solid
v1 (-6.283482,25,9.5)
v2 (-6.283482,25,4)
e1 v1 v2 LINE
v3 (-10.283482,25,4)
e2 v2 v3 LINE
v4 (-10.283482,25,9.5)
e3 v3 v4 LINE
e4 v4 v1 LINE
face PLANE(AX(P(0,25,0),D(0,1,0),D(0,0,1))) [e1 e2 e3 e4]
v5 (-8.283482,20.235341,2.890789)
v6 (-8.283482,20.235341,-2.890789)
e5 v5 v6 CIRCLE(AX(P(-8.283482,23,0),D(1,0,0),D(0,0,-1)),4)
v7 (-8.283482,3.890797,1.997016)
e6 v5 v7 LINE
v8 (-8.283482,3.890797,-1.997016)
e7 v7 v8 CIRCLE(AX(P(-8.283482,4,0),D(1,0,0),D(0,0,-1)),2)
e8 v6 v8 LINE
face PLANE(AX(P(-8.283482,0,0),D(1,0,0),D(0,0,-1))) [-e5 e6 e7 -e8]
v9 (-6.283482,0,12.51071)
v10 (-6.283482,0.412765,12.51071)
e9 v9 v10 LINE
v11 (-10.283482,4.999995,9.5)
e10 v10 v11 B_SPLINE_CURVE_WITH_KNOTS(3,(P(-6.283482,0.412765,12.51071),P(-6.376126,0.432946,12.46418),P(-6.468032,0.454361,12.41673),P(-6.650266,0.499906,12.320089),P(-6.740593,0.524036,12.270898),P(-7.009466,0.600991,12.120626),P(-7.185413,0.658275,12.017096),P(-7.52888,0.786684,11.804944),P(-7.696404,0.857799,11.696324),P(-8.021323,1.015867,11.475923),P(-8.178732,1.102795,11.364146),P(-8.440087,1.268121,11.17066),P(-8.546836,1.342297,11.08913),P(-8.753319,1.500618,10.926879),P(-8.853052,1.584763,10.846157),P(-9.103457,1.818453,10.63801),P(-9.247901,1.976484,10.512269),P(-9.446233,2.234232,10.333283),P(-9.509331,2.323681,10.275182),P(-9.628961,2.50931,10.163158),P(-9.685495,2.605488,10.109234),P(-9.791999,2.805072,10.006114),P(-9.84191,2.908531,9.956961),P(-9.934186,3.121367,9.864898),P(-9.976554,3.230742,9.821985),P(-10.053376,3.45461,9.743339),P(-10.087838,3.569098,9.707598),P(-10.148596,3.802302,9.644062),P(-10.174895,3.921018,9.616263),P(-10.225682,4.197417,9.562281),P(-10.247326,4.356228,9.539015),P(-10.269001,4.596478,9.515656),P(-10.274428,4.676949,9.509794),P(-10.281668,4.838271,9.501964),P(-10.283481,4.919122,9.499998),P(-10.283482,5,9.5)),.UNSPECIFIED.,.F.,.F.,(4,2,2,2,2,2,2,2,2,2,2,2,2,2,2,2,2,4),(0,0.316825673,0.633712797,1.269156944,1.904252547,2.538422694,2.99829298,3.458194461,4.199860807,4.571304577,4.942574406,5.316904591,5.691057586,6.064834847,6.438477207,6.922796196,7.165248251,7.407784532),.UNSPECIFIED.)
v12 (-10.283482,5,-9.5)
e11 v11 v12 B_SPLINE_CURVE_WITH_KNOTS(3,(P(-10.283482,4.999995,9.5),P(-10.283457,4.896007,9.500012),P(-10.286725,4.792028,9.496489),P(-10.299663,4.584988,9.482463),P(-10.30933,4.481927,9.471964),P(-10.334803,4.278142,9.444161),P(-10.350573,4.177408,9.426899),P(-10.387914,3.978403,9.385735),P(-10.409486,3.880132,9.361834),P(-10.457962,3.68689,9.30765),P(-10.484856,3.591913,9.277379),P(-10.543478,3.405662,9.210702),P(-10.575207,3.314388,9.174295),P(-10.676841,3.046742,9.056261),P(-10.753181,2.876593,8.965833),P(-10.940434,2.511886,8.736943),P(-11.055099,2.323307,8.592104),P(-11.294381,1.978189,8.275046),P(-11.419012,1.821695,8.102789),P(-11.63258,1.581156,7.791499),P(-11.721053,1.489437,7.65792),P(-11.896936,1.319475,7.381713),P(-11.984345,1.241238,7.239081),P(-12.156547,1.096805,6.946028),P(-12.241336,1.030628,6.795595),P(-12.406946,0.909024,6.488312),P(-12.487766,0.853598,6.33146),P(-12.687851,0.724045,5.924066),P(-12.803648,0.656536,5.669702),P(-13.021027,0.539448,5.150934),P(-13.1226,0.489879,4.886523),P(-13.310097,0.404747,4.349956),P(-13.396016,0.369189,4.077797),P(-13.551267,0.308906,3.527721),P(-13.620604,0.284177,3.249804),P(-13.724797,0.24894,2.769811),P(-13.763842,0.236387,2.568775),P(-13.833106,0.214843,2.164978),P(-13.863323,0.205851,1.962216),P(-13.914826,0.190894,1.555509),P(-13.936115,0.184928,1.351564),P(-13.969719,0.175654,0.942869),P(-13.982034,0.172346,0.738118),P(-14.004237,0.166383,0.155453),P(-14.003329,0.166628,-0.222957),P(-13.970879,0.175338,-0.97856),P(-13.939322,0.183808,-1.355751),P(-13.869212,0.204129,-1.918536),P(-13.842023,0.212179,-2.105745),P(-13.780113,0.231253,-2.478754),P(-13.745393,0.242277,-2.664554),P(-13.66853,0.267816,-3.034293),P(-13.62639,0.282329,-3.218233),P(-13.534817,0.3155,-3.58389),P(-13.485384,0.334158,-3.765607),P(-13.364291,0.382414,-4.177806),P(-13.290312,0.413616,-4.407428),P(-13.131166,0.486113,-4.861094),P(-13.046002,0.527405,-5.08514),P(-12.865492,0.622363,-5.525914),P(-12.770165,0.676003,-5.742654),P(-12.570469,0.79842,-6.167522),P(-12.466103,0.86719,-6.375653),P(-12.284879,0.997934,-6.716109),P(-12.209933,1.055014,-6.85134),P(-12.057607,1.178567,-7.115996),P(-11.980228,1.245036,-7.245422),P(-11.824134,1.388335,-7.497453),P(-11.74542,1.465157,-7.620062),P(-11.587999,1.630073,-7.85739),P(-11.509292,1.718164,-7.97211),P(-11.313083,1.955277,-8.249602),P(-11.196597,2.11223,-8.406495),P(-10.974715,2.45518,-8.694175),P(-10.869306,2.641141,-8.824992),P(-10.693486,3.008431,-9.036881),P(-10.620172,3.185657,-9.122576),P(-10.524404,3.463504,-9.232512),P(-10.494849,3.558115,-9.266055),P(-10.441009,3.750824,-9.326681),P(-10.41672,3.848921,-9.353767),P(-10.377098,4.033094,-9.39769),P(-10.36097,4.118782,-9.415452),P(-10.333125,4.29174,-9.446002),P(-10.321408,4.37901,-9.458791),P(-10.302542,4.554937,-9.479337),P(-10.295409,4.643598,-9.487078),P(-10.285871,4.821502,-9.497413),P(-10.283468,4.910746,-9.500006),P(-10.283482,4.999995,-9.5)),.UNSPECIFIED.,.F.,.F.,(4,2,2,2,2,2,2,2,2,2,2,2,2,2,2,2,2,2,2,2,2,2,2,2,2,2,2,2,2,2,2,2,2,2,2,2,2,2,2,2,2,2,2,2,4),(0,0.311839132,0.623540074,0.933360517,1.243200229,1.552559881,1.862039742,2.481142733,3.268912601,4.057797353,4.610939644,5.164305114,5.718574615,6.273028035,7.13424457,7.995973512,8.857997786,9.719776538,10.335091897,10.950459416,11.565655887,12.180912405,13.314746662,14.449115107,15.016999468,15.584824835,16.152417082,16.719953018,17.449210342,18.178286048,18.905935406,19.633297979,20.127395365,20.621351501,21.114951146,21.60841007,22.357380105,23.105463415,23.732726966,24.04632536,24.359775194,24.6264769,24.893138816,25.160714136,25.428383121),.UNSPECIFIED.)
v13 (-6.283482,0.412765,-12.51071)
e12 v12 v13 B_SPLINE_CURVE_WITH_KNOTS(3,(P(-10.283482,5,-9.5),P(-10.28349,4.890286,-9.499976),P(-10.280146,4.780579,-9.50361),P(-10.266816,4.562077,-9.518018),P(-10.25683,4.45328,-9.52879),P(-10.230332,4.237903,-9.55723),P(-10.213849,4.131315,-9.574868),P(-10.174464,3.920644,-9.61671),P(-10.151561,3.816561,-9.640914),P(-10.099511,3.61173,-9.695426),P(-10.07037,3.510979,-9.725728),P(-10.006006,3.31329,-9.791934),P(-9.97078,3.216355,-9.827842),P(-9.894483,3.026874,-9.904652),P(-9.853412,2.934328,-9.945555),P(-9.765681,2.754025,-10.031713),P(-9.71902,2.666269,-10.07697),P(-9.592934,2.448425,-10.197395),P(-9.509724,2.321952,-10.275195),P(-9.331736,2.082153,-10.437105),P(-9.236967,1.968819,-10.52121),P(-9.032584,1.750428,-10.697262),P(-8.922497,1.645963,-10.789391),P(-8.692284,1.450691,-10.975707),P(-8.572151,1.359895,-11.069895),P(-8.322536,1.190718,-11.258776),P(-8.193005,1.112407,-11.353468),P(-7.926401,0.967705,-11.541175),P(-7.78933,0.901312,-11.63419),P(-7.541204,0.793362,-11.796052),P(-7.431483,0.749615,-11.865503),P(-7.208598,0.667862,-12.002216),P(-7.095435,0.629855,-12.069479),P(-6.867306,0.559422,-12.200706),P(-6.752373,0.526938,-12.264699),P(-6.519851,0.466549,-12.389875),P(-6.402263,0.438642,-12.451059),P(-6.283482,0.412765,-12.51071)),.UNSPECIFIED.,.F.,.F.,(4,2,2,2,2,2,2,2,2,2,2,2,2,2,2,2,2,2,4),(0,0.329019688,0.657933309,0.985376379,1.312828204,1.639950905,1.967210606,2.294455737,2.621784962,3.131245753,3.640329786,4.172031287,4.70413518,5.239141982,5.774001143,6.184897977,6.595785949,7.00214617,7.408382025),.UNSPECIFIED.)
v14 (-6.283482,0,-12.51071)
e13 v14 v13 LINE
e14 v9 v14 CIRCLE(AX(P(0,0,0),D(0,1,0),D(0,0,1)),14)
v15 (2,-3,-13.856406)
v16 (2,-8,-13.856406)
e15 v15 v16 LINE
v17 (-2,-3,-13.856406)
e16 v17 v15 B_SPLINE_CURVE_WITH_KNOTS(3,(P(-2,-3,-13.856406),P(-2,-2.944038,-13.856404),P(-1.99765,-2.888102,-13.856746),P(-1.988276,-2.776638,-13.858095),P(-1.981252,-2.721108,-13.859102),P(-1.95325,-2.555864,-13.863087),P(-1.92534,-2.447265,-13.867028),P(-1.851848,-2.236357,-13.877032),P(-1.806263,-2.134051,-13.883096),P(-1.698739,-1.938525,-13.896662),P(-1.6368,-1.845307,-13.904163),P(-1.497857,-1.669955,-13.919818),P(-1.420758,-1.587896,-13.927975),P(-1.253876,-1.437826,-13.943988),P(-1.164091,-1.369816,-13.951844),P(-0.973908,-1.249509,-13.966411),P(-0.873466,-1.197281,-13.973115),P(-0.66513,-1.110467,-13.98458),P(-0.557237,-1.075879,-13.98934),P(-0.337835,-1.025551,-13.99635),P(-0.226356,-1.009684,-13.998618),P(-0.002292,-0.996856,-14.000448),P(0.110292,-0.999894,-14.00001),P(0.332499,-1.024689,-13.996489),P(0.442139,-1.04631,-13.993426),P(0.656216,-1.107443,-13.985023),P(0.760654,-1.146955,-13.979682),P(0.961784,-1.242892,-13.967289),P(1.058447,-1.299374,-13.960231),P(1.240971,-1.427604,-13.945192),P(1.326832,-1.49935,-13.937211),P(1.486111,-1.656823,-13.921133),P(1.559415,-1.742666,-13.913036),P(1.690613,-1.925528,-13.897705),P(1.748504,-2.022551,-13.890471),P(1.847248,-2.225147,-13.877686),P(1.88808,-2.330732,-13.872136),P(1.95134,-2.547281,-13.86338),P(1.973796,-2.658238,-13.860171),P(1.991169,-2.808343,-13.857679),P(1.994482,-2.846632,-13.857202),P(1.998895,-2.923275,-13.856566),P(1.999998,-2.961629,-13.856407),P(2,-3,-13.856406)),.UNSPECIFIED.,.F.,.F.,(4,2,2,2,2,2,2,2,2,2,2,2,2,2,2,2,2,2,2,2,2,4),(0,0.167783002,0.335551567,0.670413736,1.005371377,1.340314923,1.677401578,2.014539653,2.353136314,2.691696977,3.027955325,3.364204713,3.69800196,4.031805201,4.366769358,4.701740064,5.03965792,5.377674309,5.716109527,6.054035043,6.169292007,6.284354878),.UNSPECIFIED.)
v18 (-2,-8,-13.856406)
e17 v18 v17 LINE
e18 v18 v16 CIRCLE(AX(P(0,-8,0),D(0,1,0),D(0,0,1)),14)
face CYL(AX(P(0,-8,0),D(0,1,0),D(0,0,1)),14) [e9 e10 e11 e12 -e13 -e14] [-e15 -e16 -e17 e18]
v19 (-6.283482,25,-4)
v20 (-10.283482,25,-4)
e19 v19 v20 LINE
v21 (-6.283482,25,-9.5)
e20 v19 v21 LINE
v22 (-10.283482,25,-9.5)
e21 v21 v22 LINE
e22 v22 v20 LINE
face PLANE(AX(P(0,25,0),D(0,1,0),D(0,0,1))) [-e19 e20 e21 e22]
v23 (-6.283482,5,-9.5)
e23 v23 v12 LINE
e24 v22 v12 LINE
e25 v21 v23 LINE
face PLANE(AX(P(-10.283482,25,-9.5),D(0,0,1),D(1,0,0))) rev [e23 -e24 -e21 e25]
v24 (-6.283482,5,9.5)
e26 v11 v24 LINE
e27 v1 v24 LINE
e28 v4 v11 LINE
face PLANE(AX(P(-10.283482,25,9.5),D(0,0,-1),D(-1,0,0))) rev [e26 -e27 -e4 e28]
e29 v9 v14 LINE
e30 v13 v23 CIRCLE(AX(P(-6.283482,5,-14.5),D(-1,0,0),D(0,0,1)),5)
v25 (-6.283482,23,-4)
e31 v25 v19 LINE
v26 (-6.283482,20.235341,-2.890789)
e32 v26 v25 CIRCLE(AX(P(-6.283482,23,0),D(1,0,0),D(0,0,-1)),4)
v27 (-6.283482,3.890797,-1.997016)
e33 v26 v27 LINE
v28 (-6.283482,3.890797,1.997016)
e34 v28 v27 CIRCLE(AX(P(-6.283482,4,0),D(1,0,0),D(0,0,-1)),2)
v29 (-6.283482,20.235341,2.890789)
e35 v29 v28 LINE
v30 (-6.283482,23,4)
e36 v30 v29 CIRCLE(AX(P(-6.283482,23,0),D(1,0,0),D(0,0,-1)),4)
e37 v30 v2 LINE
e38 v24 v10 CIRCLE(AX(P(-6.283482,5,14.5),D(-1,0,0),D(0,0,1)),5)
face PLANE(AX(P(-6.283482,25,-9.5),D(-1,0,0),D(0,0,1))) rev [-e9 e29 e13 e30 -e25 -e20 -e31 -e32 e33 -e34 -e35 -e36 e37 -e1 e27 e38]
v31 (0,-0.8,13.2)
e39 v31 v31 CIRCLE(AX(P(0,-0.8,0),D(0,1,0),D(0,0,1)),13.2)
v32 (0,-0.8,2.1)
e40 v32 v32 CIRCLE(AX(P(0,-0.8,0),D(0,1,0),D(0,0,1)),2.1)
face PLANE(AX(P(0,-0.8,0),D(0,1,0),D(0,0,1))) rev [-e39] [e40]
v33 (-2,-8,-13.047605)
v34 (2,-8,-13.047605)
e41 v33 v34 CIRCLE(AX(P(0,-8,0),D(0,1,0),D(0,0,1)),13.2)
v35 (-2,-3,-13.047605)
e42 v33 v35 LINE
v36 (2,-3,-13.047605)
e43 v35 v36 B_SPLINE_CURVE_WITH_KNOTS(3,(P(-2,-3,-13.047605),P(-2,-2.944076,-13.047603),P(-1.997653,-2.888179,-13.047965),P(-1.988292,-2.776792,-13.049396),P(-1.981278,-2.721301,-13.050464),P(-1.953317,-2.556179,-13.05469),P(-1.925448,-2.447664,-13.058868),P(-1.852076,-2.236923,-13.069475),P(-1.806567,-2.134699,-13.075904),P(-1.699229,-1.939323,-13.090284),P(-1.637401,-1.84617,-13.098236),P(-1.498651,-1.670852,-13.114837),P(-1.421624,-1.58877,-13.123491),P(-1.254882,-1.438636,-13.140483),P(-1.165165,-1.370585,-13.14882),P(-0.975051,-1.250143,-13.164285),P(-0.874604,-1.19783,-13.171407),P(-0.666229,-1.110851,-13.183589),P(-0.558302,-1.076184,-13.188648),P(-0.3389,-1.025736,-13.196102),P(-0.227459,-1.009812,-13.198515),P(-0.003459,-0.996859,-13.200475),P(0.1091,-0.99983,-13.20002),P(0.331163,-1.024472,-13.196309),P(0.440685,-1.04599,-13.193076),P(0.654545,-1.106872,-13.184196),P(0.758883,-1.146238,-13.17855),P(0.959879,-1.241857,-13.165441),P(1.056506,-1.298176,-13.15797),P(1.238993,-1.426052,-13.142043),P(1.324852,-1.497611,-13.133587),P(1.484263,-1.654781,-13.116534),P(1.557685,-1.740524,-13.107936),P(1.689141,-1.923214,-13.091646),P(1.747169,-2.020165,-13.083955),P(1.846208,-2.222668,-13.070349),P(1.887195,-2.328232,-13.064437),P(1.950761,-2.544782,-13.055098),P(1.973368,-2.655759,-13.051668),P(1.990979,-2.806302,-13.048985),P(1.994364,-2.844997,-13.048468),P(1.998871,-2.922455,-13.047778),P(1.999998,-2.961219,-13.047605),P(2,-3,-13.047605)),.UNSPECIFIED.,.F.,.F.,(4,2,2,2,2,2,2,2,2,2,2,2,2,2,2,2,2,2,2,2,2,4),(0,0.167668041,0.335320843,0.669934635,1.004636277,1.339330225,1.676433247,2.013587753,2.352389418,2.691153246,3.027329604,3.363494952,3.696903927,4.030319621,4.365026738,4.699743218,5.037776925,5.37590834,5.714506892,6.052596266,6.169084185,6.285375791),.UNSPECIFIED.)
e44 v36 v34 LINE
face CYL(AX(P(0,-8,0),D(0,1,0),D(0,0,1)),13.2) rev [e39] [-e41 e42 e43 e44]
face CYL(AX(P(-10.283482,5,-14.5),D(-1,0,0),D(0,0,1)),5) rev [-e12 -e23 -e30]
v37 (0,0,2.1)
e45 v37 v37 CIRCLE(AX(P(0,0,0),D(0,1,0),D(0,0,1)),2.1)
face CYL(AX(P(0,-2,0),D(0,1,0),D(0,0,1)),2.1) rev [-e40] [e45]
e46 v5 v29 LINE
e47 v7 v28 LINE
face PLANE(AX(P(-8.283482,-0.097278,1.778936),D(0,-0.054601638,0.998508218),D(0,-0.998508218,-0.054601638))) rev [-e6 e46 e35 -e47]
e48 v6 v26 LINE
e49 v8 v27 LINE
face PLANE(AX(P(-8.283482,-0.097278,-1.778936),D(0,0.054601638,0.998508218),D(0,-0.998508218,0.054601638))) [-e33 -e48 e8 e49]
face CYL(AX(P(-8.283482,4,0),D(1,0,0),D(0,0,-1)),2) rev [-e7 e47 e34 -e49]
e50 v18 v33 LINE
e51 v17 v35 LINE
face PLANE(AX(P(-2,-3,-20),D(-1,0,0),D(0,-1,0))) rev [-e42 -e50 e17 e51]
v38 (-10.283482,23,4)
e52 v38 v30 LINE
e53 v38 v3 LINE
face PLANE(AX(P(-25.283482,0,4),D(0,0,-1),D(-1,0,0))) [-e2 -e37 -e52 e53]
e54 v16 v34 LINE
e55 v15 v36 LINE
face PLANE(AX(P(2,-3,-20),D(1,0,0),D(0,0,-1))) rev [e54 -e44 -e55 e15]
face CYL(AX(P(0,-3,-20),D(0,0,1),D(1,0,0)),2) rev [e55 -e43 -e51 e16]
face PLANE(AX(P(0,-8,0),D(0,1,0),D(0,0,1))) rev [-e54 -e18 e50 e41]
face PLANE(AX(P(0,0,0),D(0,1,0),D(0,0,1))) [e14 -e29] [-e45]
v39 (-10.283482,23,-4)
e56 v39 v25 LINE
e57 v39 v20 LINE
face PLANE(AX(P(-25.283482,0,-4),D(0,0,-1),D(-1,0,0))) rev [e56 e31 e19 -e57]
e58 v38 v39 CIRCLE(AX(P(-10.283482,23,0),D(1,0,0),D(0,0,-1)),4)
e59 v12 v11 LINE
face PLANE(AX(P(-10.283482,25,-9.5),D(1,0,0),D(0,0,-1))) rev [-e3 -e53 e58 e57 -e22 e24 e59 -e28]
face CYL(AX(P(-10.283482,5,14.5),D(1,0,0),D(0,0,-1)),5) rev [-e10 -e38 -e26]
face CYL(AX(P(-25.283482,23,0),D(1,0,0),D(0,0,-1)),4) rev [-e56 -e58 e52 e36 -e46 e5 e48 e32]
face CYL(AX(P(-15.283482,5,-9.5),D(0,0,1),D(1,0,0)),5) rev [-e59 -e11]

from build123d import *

# Parameters (mm, degrees)
SKETCH1_R           = 14
BOSS_EXTRUDE1_DEPTH = 8
SHELL1_T            = -0.8
SKETCH2_R           = 2.1
CUT_EXTRUDE1_DEPTH  = 2
SKETCH3_W           = 4
SKETCH3_H           = 19
BOSS_EXTRUDE2_DEPTH = 25
CUT_EXTRUDE2_DEPTH  = 19
SKETCH4_3_R         = 2
CUT_EXTRUDE3_DEPTH  = 2
FILLET1_R           = 5
FILLET2_R           = 5
CUT_EXTRUDE4_DEPTH  = 20


with BuildPart() as part:
    # Sketch1 → Boss-Extrude1 (new body)
    with BuildSketch(Plane(origin=(0, 0, 0), x_dir=(1, 0, 0), z_dir=(0, 1, 0))):
        with Locations(Location((0, 0, 0), (0, 0, 270))):
            Circle(SKETCH1_R)
    extrude(amount=-BOSS_EXTRUDE1_DEPTH)

    # Shell1
    shell1_openings = [part.faces().sort_by_distance(p)[0] for p in [
        (0, -8, 0),
    ]]
    offset(amount=SHELL1_T, openings=shell1_openings, kind=Kind.INTERSECTION)

    # Sketch2 → Cut-Extrude1 (cut)
    with BuildSketch(Plane(origin=(0, 0, 0), x_dir=(1, 0, 0), z_dir=(0, 1, 0))):
        with Locations(Location((0, 0, 0), (0, 0, 270))):
            Circle(SKETCH2_R)
    extrude(amount=-CUT_EXTRUDE1_DEPTH, mode=Mode.SUBTRACT)

    # Sketch3 → Boss-Extrude2 (add)
    with BuildSketch(Plane(origin=(0, 0, 0), x_dir=(1, 0, 0), z_dir=(0, 1, 0))):
        with Locations((-8.283481901, 0)):
            Rectangle(SKETCH3_W, SKETCH3_H)
    extrude(amount=BOSS_EXTRUDE2_DEPTH)

    # Sketch4 → Cut-Extrude2 (cut)
    with BuildSketch(Plane(origin=(-6.283481901, 0, 0), x_dir=(0, 0, -1), z_dir=(1, 0, 0))):
        with BuildLine():
            ThreePointArc((-4, 23), (-3.712354677, 21.510562941), (-2.890788624, 20.235340684))
            ThreePointArc((-2.890788624, 20.235340684), (0, 19), (2.890788624, 20.235340684))
            ThreePointArc((2.890788624, 20.235340684), (3.712354677, 21.510562941), (4, 23))
            Line((4, 23), (4, 25))
            Line((4, 25), (-4, 25))
            Line((-4, 25), (-4, 23))
        make_face()
    extrude(amount=-CUT_EXTRUDE2_DEPTH, mode=Mode.SUBTRACT)

    # Sketch4<3> → Cut-Extrude3 (cut)
    with BuildSketch(Plane(origin=(-6.283481901, 0, 0), x_dir=(0, 0, -1), z_dir=(1, 0, 0))):
        with BuildLine():
            ThreePointArc((2.890788624, 20.235340684), (0, 19), (-2.890788624, 20.235340684))
            Line((-2.890788624, 20.235340684), (-1.997016436, 3.890796724))
            ThreePointArc((-1.997016436, 3.890796724), (-0.054622013, 5.99925397), (2, 4))
            ThreePointArc((2, 4), (1.99925397, 3.945377987), (1.997016436, 3.890796724))
            Line((1.997016436, 3.890796724), (2.890788624, 20.235340684))
        make_face()
        with Locations((0, 4)):
            Circle(SKETCH4_3_R)
    extrude(amount=-CUT_EXTRUDE3_DEPTH, mode=Mode.SUBTRACT)

    # Fillet1
    # the kernel refuses this fillet: 5 mm, written as the material it adds along each edge
    with BuildSketch(Plane(origin=(-10.283481901, 0, 9.5), x_dir=(-1, 0, 0), z_dir=(0, 0, -1))) as fillet1_piece_1_section:
        with BuildLine():
            CenterArc((FILLET1_R, FILLET1_R), FILLET1_R, 180, 90)
            Line((0, FILLET1_R), (0, 0))
            Line((0, 0), (FILLET1_R, 0))
        make_face()
    fillet1_piece_1 = extrude(amount=19, mode=Mode.PRIVATE)
    fillet1_piece_1 = fillet1_piece_1 & Plane(origin=(0, 1.284116868, 0), x_dir=(0, 0, 1), z_dir=(0, 1, 0)) * Cylinder(14, 58, mode=Mode.PRIVATE)
    add(fillet1_piece_1)

    # Fillet2
    # the kernel refuses this fillet: 5 mm, written as the material it adds along each edge
    with BuildSketch(Plane(origin=(-22.783481901, 0, -9.5), x_dir=(0, 1, 0), z_dir=(1, 0, 0))) as fillet2_piece_1_section:
        with BuildLine():
            CenterArc((FILLET2_R, -FILLET2_R), FILLET2_R, 90, 90)
            Line((0, -FILLET2_R), (0, 0))
            Line((0, 0), (FILLET2_R, 0))
        make_face()
    fillet2_piece_1 = extrude(amount=16.5, mode=Mode.PRIVATE)
    fillet2_piece_1 = fillet2_piece_1 & Plane(origin=(0, 1.41467333, 0), x_dir=(0, 0, 1), z_dir=(0, 1, 0)) * Cylinder(14, 53, mode=Mode.PRIVATE)
    add(fillet2_piece_1)
    with BuildSketch(Plane(origin=(-6.283481901, 0, 9.5), x_dir=(0, 1, 0), z_dir=(-1, 0, 0))) as fillet2_piece_2_section:
        with BuildLine():
            CenterArc((FILLET2_R, -FILLET2_R), FILLET2_R, 90, 90)
            Line((0, -FILLET2_R), (0, 0))
            Line((0, 0), (FILLET2_R, 0))
        make_face()
    fillet2_piece_2 = extrude(amount=16.5, mode=Mode.PRIVATE)
    fillet2_piece_2 = fillet2_piece_2 & Plane(origin=(0, 1.414673355, 0), x_dir=(0, 0, 1), z_dir=(0, 1, 0)) * Cylinder(14, 53, mode=Mode.PRIVATE)
    add(fillet2_piece_2)

    # Sketch5 → Cut-Extrude4 (cut)
    with BuildSketch(Plane.XY):
        with BuildLine():
            Line((-2, -3), (-2, -8))
            Line((-2, -8), (2, -8))
            Line((2, -8), (2, -3))
            ThreePointArc((2, -3), (0, -1), (-2, -3))
        make_face()
    extrude(amount=-CUT_EXTRUDE4_DEPTH, mode=Mode.SUBTRACT)


solid = part.part
